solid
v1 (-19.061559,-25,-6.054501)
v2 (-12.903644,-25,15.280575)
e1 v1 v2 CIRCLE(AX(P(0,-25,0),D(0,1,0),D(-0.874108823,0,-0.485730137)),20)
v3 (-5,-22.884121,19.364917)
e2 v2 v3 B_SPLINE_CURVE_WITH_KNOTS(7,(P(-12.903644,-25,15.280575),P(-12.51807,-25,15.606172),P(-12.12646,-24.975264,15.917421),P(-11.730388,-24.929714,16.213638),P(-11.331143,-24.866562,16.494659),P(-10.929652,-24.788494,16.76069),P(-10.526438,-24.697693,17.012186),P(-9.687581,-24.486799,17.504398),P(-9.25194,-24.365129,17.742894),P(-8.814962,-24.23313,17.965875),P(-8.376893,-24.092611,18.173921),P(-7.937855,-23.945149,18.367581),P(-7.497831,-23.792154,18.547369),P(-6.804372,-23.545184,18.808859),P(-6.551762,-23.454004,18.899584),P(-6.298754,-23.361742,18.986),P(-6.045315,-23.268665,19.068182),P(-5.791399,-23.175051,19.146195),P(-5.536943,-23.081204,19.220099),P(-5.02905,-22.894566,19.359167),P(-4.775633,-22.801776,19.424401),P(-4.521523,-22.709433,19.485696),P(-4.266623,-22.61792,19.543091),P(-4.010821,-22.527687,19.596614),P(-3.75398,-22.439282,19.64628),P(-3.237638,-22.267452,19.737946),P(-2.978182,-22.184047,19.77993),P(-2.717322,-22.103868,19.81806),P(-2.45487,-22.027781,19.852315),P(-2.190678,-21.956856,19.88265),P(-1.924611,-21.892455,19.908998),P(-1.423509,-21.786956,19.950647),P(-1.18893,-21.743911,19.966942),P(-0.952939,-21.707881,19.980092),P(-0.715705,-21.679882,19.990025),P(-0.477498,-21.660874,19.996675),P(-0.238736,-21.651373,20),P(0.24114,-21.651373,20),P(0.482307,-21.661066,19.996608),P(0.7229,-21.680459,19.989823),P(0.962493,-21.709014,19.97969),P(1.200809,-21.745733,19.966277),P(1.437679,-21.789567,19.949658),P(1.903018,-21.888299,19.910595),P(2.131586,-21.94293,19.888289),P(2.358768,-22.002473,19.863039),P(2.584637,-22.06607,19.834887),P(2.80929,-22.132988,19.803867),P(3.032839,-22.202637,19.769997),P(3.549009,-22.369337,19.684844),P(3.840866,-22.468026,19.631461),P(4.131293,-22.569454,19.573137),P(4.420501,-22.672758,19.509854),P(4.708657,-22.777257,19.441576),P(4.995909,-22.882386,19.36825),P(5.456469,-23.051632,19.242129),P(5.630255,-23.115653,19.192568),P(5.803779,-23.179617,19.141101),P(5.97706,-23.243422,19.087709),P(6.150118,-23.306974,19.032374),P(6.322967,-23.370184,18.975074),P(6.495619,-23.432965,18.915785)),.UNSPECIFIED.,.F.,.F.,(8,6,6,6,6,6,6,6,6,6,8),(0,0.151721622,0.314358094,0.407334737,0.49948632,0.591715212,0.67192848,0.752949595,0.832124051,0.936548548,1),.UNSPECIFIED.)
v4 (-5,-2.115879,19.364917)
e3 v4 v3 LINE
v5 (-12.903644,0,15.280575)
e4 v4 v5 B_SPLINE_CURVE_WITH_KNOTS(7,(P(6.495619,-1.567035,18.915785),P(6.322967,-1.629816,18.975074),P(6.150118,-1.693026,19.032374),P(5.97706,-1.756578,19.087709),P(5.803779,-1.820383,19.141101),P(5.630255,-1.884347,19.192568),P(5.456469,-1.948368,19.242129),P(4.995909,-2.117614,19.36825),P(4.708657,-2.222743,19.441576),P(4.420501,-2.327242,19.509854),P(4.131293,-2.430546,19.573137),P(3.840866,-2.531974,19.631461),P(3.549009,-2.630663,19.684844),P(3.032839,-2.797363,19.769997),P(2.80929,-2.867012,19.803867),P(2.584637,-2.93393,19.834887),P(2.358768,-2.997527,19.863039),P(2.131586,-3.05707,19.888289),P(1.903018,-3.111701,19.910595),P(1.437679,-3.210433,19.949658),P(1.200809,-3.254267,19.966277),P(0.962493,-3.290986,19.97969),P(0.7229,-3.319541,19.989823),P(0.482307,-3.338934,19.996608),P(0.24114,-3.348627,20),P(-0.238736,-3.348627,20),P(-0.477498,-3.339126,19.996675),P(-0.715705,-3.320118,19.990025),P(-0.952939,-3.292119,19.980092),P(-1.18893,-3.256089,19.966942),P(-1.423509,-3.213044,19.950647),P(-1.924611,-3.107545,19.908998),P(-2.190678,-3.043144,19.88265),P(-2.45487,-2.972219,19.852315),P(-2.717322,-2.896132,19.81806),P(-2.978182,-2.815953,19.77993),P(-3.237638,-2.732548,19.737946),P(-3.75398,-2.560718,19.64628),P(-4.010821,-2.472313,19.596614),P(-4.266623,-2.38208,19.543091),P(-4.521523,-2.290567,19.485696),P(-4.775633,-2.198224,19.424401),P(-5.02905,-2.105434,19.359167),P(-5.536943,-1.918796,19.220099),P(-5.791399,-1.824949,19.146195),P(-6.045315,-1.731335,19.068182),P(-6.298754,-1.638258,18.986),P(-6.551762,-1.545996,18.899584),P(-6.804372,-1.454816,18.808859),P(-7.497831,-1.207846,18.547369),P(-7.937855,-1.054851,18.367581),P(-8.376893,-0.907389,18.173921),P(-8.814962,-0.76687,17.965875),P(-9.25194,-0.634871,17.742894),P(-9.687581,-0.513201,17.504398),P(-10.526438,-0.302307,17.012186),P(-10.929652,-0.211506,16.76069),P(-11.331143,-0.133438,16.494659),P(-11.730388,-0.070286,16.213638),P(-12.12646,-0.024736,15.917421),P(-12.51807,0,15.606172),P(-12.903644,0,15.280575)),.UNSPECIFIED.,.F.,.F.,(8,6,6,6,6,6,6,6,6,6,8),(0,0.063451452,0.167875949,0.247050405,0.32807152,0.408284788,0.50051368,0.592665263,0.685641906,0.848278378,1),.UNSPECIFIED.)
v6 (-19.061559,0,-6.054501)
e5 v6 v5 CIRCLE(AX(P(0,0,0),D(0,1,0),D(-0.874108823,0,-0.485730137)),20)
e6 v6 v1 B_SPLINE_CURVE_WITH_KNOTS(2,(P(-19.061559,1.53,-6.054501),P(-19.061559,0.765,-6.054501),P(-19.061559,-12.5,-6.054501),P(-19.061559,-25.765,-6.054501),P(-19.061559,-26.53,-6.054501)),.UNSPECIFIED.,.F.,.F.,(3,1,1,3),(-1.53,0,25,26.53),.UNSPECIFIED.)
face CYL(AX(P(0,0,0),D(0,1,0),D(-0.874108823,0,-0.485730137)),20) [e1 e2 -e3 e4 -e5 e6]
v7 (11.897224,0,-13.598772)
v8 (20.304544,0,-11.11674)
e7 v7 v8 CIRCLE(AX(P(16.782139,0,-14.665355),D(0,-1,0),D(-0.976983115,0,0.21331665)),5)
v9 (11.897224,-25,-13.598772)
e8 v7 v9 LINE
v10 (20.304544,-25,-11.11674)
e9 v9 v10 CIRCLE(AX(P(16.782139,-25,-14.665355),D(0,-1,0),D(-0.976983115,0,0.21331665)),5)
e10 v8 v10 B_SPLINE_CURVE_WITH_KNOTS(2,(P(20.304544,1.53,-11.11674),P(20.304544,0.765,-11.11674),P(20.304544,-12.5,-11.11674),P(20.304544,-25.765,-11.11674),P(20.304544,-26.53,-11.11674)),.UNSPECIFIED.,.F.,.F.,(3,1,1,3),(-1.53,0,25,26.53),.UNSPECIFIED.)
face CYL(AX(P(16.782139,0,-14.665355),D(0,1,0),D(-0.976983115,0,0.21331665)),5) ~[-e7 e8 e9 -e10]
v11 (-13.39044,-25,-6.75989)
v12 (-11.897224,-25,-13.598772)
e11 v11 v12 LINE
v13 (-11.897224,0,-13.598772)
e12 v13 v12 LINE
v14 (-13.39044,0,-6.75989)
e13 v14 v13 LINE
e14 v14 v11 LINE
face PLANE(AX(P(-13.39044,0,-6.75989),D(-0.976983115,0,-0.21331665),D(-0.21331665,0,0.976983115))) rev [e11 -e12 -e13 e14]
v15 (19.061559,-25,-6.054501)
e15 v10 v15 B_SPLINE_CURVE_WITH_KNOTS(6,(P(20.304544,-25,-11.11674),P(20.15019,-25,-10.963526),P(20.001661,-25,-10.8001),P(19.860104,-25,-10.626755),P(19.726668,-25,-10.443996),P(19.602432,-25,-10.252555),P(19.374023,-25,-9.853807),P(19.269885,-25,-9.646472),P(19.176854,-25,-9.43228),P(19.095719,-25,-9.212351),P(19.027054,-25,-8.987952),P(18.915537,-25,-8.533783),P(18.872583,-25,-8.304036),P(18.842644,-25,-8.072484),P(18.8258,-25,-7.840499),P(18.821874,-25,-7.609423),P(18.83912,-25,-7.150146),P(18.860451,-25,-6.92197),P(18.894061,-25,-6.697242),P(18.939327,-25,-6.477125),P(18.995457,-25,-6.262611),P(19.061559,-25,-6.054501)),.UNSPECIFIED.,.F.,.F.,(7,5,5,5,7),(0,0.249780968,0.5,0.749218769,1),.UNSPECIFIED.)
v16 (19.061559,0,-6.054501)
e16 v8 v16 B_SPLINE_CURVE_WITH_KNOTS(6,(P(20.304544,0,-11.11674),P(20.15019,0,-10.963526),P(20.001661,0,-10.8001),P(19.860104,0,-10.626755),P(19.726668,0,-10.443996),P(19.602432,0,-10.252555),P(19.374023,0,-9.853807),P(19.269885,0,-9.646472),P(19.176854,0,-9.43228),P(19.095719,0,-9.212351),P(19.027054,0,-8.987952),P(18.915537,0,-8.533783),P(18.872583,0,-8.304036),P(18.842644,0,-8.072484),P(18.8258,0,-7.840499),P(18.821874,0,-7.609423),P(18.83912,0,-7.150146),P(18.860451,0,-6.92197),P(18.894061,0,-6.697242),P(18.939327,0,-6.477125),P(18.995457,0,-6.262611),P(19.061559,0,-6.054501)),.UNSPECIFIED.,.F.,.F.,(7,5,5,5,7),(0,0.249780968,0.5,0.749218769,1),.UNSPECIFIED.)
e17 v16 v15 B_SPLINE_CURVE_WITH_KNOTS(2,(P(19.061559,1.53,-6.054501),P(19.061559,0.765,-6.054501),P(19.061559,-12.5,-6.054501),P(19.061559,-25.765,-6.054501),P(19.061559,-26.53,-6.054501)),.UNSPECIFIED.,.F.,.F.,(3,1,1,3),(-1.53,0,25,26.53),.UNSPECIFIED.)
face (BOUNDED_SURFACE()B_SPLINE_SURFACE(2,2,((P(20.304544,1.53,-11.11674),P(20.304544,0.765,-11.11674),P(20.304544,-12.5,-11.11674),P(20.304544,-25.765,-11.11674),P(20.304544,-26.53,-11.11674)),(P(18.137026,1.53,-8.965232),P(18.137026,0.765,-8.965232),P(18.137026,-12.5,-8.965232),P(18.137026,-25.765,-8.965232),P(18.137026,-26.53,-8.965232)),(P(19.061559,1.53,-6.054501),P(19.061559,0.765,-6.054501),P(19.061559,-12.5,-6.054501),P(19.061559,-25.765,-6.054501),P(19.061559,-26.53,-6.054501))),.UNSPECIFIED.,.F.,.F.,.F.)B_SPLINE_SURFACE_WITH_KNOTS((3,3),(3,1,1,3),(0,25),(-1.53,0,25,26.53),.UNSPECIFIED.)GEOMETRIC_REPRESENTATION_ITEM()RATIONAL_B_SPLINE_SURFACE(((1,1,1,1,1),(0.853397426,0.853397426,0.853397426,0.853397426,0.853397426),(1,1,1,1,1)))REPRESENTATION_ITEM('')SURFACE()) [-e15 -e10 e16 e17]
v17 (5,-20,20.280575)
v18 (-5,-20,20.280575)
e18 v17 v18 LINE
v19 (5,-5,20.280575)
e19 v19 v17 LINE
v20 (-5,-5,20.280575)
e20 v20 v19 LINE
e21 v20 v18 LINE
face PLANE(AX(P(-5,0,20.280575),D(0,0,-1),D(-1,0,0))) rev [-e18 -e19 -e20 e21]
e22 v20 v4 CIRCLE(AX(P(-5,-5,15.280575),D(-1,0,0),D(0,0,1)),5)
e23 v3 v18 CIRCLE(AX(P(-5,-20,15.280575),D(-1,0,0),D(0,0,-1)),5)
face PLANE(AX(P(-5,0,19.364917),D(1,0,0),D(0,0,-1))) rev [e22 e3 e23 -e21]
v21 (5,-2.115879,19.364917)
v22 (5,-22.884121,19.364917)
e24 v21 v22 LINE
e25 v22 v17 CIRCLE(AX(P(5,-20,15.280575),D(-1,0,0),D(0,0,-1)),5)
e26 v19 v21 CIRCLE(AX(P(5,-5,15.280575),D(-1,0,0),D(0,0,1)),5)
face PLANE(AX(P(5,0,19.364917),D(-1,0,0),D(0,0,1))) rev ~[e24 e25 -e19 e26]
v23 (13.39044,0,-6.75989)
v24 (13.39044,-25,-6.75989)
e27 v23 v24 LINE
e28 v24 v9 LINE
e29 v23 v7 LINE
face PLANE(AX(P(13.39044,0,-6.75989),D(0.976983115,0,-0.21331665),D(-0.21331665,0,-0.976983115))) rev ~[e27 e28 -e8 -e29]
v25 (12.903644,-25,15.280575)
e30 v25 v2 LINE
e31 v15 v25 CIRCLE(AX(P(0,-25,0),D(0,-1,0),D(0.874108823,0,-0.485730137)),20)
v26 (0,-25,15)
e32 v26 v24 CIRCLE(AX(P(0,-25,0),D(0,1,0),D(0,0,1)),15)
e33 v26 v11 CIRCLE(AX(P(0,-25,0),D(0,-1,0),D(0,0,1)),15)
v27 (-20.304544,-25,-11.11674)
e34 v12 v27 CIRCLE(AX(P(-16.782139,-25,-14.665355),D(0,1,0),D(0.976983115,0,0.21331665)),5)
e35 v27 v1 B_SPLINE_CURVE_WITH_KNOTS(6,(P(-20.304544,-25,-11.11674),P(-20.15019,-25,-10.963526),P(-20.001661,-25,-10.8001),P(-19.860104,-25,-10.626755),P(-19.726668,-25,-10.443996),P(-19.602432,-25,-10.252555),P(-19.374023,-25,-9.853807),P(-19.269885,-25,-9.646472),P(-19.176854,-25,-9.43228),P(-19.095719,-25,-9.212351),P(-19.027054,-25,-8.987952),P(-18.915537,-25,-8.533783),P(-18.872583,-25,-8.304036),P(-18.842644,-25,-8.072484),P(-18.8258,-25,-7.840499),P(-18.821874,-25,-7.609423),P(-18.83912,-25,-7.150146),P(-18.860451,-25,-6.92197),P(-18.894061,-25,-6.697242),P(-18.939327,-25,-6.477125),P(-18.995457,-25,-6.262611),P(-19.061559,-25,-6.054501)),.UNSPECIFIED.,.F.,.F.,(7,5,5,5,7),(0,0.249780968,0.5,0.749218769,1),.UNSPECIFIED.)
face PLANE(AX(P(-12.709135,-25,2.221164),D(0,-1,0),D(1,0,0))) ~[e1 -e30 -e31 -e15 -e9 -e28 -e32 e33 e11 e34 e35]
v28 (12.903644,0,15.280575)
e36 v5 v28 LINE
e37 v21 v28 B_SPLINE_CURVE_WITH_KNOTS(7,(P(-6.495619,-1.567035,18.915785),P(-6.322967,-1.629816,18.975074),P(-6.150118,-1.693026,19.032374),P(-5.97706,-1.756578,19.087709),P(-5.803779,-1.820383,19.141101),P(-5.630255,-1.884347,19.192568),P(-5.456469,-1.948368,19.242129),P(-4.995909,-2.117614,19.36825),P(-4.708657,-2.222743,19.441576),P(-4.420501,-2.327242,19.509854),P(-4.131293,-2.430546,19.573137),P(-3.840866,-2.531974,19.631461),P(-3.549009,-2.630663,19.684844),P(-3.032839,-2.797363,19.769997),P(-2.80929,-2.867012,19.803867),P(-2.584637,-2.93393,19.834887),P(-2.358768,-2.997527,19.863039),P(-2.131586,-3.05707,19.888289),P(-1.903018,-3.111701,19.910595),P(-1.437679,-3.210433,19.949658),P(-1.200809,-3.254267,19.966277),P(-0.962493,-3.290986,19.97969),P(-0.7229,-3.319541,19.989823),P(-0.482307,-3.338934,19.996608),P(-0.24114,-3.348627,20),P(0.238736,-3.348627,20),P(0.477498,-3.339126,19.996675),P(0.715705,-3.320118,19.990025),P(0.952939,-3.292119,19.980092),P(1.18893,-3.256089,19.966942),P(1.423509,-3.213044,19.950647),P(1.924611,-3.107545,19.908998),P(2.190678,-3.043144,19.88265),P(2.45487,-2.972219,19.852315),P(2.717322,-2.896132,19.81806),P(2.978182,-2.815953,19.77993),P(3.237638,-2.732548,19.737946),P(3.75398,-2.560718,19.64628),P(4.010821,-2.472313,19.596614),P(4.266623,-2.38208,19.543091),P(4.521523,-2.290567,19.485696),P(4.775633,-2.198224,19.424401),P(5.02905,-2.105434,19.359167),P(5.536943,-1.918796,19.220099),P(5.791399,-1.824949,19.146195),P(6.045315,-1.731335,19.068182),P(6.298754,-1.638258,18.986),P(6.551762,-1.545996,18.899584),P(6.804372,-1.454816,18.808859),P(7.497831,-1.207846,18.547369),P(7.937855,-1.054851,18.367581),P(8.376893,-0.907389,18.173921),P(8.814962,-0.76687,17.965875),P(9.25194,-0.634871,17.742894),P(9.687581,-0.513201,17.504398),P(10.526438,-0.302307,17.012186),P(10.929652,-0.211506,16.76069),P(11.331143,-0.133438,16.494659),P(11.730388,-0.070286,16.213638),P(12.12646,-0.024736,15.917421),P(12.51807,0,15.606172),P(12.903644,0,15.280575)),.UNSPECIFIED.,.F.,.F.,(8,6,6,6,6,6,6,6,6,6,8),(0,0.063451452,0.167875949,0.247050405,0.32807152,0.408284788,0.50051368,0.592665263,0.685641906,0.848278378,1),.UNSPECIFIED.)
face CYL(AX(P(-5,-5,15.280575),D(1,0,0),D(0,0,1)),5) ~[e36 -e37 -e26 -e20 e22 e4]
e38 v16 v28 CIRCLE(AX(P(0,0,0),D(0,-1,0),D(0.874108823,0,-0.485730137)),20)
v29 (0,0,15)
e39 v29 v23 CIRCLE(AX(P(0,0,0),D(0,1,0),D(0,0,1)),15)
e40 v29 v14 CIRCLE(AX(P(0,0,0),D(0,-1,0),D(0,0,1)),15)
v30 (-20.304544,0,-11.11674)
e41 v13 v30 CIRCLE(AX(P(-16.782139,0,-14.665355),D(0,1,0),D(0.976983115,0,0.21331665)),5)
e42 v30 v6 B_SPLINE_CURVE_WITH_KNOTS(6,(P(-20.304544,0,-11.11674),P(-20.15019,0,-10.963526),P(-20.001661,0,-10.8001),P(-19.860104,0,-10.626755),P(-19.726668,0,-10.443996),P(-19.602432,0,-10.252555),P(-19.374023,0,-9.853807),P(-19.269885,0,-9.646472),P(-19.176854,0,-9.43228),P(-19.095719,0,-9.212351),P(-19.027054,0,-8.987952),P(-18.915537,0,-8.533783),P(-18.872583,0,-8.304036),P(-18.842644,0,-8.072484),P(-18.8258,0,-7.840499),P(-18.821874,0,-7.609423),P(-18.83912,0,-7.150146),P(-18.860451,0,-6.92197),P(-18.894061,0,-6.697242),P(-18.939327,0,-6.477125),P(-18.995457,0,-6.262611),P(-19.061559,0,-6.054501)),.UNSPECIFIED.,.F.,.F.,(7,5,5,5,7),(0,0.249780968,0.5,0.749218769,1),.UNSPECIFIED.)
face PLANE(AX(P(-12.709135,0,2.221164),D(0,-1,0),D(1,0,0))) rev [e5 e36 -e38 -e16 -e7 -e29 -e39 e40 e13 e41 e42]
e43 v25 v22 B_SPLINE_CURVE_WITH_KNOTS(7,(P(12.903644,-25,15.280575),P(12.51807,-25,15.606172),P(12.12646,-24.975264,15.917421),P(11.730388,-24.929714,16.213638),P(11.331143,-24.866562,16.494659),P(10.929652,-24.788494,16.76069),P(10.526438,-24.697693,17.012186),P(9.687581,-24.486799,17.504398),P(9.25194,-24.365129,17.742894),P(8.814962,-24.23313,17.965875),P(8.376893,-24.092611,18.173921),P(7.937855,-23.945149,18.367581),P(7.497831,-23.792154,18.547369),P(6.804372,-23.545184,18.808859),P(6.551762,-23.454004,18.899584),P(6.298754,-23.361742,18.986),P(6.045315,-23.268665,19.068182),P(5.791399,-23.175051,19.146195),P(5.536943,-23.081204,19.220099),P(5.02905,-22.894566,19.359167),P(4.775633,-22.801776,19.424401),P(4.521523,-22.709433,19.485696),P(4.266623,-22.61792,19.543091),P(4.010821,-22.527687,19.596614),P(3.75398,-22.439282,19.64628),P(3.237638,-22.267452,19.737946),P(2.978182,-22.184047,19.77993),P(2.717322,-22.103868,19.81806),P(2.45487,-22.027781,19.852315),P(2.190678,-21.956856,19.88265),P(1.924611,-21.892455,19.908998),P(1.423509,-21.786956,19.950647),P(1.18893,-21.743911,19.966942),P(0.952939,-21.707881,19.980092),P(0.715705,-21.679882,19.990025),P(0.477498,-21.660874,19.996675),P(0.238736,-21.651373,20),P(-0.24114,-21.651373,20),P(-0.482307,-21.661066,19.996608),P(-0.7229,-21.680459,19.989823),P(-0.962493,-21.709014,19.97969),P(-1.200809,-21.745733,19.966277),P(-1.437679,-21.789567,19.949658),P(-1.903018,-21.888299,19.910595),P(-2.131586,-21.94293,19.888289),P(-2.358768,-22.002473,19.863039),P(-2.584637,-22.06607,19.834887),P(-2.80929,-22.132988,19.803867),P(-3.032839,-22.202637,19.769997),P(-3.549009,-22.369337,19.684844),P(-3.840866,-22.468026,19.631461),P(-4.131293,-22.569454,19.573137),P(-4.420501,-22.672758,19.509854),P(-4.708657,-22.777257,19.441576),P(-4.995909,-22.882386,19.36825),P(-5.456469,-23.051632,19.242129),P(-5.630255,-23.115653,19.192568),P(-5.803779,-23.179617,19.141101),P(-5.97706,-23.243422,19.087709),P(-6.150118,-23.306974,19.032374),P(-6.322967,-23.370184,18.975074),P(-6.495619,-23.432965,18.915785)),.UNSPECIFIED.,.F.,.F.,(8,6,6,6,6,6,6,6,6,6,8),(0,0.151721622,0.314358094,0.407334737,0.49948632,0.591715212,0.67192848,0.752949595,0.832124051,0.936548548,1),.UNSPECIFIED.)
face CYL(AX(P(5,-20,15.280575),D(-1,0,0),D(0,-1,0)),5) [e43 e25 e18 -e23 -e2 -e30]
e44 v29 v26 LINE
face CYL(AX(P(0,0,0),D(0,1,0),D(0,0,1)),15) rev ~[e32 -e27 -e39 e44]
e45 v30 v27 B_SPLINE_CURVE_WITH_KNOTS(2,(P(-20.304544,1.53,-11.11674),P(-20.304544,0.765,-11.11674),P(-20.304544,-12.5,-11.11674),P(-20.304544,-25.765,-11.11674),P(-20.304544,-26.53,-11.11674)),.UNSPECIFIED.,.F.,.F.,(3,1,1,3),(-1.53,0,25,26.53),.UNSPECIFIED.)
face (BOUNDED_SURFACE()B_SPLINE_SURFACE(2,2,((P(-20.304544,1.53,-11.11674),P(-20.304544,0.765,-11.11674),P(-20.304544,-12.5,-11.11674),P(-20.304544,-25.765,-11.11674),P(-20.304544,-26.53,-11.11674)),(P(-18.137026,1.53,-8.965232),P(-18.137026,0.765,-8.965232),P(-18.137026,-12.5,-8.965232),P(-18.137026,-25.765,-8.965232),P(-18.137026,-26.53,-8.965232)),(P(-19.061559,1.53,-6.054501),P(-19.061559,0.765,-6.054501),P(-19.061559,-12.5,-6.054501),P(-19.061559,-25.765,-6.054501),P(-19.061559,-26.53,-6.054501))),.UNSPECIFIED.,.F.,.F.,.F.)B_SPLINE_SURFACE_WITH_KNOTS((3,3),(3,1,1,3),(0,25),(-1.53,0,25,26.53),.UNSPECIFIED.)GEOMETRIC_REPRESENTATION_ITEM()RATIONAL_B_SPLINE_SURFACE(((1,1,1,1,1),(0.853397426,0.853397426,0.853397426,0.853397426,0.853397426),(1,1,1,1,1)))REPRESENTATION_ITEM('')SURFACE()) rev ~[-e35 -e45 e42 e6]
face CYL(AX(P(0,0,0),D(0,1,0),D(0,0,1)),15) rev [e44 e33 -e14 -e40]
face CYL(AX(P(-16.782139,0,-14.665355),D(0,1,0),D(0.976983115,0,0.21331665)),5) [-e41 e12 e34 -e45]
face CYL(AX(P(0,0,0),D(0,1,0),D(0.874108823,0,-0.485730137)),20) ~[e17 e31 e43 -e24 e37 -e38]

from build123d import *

# Parameters (mm, degrees)
F1_DEPTH = 25
F3_R     = 5


# Not quite as in the source:
# - a feature names something its author has since deleted; it is built from what else it names


with BuildPart() as f1:
    # F0 (on Front) → F1 (new body)
    with BuildSketch(Plane.XZ):
        with BuildLine():
            ThreePointArc((11.8972236274, -13.5987717306), (19.6369586065, -18.770230883), (17.4821764595, -9.7146027319))
            ThreePointArc((17.4821764595, -9.7146027319), (18.3784296837, 7.8888099459), (5, 19.364916731))
            Line((5, 19.364916731), (5, 20.2805753797))
            Line((5, 20.2805753797), (0, 20.2805753797))
            Line((0, 20.2805753797), (0, 20))
            Line((0, 20), (0, 15))
            ThreePointArc((0, 15), (12.7749432268, 7.86135011), (13.3904401788, -6.7598899265))
            Line((13.3904401788, -6.7598899265), (11.8972236274, -13.5987717306))
        make_face()
    extrude(amount=F1_DEPTH)

    # F2: F1 across plane


with BuildPart() as f1_1:
    add(f1.part)
    add(f1.part.mirror(Plane.YZ))

    # F3
    f3_edges = [f1_1.edges().sort_by_distance(p)[0] for p in [
        (-17.482176, -12.5, -9.714603),
        (17.482176, -12.5, -9.714603),
        (0, -25, 20.280575),
        (0, 0, 20.280575),
    ]]
    fillet(f3_edges, radius=F3_R)


solid = f1_1.part
